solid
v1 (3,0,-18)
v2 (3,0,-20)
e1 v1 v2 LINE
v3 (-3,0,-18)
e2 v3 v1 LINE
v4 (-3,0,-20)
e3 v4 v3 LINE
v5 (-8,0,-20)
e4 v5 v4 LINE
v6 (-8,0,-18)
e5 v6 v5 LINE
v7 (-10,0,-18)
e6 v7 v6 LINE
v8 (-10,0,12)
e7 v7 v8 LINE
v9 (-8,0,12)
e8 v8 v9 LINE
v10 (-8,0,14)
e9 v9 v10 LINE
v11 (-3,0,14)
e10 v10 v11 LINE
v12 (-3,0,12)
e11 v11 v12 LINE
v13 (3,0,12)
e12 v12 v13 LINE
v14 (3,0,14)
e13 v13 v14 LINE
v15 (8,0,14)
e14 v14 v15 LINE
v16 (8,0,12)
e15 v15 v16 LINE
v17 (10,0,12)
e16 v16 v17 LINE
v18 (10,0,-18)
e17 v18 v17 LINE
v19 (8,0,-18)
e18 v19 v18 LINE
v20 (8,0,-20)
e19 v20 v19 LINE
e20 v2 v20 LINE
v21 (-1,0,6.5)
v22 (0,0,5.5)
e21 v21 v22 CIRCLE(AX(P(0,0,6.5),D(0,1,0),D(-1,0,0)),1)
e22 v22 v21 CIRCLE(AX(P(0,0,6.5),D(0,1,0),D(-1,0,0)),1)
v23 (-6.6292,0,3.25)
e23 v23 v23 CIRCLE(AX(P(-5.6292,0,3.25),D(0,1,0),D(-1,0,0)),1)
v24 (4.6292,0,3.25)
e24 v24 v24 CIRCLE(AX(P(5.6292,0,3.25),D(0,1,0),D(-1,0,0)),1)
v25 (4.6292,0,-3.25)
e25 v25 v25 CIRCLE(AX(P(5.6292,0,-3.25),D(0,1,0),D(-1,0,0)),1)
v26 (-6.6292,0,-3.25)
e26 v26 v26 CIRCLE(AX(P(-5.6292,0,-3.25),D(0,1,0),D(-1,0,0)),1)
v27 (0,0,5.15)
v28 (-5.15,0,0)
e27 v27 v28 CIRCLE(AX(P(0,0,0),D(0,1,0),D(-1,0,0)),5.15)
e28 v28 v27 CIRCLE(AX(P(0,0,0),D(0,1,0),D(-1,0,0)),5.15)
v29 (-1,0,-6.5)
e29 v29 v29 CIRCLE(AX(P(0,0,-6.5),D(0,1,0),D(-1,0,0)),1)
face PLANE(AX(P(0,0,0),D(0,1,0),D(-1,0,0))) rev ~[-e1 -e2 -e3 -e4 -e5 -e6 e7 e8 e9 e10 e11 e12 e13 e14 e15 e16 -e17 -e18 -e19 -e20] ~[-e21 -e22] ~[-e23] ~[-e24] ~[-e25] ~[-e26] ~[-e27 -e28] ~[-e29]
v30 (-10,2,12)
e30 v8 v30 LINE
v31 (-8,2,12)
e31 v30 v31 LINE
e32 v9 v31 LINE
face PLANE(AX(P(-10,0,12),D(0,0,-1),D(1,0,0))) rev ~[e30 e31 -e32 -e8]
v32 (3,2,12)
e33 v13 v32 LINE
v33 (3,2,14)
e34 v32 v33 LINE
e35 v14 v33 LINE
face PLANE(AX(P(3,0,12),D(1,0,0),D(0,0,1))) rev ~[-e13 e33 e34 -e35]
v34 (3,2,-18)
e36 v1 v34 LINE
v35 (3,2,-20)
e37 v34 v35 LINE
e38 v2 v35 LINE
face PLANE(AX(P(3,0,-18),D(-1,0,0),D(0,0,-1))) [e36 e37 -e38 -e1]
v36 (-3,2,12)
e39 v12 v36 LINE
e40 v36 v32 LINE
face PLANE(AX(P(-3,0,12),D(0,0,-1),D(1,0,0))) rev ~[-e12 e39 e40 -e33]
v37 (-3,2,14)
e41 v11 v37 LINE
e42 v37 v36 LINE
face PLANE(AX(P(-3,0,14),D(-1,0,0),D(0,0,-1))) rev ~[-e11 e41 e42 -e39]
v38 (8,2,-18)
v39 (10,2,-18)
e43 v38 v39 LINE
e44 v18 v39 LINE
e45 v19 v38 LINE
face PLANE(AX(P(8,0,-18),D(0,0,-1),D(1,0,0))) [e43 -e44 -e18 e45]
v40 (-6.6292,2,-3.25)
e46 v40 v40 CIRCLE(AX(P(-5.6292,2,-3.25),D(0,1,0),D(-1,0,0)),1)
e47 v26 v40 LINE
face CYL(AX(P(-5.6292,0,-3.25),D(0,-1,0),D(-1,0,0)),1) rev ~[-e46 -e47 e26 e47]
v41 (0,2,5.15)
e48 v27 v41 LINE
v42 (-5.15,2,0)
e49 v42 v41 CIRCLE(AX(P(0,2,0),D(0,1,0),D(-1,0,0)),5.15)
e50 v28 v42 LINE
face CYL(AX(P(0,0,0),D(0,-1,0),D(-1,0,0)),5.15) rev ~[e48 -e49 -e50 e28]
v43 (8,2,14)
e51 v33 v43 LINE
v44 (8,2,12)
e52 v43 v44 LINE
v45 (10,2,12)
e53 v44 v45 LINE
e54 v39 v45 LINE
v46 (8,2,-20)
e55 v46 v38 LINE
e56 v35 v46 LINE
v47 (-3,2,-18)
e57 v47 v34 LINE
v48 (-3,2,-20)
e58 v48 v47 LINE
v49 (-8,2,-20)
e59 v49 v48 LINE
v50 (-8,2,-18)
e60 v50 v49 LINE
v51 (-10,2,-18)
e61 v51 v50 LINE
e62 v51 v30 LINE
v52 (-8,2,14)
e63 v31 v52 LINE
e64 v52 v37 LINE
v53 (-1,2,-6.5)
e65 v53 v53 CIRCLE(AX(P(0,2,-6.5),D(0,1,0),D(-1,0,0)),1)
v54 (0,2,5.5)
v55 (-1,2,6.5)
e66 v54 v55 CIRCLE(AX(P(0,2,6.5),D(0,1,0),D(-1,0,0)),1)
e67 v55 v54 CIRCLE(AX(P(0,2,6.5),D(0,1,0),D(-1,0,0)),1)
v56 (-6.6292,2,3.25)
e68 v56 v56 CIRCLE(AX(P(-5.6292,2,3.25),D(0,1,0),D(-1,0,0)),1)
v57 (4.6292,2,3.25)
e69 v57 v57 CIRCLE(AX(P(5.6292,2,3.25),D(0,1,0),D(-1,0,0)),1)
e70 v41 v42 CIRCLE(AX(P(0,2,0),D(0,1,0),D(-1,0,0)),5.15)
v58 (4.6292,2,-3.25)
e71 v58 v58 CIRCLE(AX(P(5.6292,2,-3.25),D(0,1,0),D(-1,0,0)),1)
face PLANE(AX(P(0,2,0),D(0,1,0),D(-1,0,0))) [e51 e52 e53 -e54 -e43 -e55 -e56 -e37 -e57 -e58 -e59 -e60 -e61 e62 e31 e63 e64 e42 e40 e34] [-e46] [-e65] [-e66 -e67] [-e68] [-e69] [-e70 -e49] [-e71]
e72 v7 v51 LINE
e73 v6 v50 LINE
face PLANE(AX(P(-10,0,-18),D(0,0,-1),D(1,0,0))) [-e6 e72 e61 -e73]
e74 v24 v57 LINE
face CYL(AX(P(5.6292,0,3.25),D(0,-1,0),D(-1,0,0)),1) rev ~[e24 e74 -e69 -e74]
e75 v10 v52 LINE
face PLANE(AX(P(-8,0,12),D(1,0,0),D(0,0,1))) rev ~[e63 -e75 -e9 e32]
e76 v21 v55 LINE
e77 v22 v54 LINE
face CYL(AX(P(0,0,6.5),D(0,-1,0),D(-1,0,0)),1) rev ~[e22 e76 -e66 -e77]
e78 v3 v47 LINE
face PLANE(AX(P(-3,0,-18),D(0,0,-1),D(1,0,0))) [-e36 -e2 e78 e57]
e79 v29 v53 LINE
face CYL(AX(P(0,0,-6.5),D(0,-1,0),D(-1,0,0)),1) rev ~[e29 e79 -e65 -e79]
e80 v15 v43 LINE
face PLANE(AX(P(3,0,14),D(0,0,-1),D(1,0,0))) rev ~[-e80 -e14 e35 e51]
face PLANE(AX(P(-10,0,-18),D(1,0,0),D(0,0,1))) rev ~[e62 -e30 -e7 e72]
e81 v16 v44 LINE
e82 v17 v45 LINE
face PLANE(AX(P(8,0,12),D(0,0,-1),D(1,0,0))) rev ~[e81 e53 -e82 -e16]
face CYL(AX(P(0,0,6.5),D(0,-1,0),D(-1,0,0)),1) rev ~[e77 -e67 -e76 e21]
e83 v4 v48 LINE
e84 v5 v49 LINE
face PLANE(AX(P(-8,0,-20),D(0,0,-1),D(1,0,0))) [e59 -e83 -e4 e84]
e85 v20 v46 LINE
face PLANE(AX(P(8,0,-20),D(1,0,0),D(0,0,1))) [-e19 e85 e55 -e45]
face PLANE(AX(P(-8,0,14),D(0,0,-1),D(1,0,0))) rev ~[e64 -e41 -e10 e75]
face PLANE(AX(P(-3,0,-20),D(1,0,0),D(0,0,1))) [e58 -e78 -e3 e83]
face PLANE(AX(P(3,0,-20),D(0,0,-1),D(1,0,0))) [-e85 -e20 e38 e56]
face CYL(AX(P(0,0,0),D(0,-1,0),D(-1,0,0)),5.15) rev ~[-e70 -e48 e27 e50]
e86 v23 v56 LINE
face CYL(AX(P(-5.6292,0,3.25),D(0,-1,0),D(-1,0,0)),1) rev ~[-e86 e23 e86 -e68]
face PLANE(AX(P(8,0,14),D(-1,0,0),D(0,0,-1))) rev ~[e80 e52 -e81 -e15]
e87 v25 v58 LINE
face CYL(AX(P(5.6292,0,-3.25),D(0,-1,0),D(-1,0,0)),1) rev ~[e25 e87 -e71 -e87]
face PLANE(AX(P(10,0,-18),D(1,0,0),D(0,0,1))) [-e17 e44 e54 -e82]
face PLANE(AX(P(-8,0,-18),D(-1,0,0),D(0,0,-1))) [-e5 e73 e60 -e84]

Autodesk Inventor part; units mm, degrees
ref_plane "YZ Plane" through (0, 0, 0) normal (1, 0, 0) x (0, 1, 0)
ref_plane "XZ Plane" through (0, 0, 0) normal (0, 1, 0) x (-1, 0, 0)
ref_plane "XY Plane" through (0, 0, 0) normal (0, 0, 1) x (1, 0, 0)
sketch "Sketch1" plane through (0, 0, 0) normal (0, 1, 0) x (-1, 0, 0)
  circle A0 centre (0, 0) radius 5.15
  line L0 (10, -18) -> (8, -18)
  line L1 (8, -18) -> (8, -20)
  line L2 (8, -20) -> (3, -20)
  line L3 (3, -20) -> (3, -18)
  line L4 (3, -18) -> (-3, -18)
  line L5 (-3, -18) -> (-3, -20)
  line L6 (-3, -20) -> (-8, -20)
  line L7 (-8, -20) -> (-8, -18)
  line L8 (-8, -18) -> (-10, -18)
  line L9 (10, -18) -> (10, 12)
  line L10 (-10, -18) -> (-10, 12)
  line L11 (10, 12) -> (8, 12)
  line L12 (8, 12) -> (8, 14)
  line L13 (8, 14) -> (3, 14)
  line L14 (3, 14) -> (3, 12)
  line L15 (3, 12) -> (-3, 12)
  line L16 (-3, 12) -> (-3, 14)
  line L17 (-3, 14) -> (-8, 14)
  line L18 (-8, 14) -> (-8, 12)
  line L19 (-8, 12) -> (-10, 12)
  line L20 (0, 0) -> (0, 6.5)
  circle A1 centre (0, 6.5) radius 1
  circle A2 centre (-5.6292, 3.25) radius 1
  circle A3 centre (-5.6292, -3.25) radius 1
  circle A4 centre (0, -6.5) radius 1
  circle A5 centre (5.6292, -3.25) radius 1
  circle A6 centre (5.6292, 3.25) radius 1
  dimension "d7" = 360
  dimension "d33" = 2
  dimension "d34" = 2
  dimension "d35" = 5
  dimension "d36" = 6
  dimension "d37" = 5
  dimension "d42" = 30
  dimension "d43" = 2
  dimension "d44" = 2
  dimension "d45" = 5
  dimension "d46" = 6
  dimension "d47" = 5
  dimension "d48" = 6.5
  dimension "d49" = 2
  dimension "d52" = 360
extrude "Extrusion1" add sketch "Sketch1" along normal blind 2
properties part number "Motor Mount"
